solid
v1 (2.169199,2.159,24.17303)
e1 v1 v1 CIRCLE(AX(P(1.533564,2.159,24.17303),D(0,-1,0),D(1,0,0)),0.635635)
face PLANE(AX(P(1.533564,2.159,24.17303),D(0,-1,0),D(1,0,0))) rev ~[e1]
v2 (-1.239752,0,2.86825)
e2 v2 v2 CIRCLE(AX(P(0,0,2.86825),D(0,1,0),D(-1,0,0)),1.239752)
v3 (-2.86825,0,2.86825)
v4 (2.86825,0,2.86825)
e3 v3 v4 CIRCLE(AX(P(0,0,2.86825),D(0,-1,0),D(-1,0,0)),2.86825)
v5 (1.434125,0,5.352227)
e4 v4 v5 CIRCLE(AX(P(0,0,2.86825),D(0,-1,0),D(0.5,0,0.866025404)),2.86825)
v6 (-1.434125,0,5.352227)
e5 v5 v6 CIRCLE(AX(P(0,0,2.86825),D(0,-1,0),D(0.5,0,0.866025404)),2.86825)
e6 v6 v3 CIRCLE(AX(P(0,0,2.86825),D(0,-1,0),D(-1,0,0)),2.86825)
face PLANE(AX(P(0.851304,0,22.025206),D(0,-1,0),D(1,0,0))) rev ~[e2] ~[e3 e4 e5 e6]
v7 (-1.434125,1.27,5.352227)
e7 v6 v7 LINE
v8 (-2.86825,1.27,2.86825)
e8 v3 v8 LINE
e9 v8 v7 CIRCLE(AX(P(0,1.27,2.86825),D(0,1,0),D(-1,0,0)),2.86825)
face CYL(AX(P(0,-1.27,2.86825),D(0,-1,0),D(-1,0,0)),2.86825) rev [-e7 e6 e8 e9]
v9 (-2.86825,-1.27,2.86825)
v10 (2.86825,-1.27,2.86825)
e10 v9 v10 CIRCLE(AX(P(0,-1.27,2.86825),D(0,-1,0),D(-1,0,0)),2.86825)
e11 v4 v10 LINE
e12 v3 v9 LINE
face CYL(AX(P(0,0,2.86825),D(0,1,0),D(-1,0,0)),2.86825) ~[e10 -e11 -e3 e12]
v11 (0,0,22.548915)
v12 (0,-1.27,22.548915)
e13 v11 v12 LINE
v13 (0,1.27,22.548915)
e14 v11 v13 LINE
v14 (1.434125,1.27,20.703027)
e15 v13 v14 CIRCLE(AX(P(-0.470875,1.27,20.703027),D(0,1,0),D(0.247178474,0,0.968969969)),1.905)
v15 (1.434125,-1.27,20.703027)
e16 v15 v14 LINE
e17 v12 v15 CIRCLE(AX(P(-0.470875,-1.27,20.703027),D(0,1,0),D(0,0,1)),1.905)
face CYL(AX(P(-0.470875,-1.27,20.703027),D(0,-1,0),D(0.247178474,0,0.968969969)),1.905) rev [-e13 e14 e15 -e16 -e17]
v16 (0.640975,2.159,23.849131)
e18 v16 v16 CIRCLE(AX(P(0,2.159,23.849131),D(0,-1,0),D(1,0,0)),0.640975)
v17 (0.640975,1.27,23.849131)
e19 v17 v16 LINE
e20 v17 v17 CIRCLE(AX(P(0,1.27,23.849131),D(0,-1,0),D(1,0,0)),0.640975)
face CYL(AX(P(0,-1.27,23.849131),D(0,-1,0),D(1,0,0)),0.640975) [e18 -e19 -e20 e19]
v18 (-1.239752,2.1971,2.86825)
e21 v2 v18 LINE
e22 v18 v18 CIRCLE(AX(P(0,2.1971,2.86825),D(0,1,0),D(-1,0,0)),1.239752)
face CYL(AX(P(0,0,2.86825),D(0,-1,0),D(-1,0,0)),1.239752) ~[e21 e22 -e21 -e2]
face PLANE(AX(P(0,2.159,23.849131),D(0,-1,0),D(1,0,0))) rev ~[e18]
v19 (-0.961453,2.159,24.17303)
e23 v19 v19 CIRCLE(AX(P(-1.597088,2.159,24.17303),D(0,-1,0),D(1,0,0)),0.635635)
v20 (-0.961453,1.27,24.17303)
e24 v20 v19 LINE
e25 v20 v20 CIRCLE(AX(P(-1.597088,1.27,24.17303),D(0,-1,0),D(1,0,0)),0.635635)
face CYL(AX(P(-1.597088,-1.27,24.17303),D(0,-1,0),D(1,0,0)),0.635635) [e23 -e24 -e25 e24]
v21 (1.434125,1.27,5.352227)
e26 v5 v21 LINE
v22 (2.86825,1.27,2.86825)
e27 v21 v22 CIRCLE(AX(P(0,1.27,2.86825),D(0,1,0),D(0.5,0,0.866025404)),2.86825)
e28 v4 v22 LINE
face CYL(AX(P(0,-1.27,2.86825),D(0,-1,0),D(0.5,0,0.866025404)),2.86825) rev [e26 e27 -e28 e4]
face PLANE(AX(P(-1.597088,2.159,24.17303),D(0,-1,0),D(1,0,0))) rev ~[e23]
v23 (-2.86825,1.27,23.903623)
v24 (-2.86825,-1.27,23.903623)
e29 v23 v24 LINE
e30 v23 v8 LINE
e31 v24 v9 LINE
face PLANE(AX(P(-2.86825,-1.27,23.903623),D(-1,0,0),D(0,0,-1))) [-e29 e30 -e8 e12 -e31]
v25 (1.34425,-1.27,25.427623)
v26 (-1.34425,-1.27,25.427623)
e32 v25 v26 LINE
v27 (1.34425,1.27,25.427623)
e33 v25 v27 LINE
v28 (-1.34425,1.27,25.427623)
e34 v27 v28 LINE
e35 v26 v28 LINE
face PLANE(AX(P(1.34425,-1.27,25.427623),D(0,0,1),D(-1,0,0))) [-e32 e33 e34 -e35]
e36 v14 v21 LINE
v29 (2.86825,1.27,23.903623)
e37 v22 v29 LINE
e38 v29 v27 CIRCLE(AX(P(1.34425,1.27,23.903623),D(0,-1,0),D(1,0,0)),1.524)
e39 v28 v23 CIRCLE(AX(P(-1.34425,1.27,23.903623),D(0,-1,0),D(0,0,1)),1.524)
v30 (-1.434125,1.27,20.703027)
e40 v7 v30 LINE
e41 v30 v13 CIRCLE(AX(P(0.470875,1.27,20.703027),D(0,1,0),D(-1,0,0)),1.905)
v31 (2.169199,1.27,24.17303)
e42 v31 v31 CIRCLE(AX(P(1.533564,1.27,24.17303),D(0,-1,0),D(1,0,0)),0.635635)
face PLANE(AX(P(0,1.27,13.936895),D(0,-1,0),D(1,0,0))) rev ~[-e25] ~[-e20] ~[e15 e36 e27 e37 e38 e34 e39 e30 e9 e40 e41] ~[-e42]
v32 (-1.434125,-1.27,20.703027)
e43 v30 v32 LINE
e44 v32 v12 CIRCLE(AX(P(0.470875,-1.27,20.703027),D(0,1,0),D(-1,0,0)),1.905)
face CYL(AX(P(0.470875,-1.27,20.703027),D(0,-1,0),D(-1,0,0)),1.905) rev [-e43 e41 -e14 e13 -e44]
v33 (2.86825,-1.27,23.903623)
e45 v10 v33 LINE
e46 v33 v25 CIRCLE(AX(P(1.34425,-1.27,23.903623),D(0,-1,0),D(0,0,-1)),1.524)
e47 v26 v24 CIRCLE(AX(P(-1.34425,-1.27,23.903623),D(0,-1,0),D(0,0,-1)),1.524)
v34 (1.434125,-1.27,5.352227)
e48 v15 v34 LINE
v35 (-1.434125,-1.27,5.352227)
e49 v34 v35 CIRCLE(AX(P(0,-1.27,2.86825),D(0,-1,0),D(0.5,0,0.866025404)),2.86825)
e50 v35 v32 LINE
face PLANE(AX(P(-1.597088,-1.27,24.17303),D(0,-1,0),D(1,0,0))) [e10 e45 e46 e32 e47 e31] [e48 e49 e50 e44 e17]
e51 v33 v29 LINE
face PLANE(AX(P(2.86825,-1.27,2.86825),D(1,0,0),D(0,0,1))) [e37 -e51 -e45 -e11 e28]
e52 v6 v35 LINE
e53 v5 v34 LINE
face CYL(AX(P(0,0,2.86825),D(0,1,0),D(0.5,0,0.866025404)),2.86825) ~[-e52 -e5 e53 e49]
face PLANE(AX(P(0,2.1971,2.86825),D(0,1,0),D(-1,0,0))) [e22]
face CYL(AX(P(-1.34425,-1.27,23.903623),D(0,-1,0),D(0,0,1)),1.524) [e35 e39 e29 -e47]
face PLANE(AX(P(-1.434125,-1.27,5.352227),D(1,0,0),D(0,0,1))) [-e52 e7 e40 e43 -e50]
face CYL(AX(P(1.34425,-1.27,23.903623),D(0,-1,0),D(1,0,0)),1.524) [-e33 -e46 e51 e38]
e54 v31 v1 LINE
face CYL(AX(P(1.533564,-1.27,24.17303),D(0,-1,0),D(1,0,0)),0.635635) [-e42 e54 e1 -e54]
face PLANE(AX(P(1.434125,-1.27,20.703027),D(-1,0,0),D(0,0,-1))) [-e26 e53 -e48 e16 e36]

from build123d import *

# Parameters (mm, degrees)
F1_DEPTH    = 1.27
F3_R        = 1.524
F5_T1_DEPTH = 1.27
F2_R        = 1.2397519619
F6_DEPTH    = 2.1971
F4_R        = 0.6356353333
F4_R_2      = 0.6409754112
F7_DEPTH    = 3.429
F9_DEPTH    = 2.54


# Not quite as in the source:
# - a fillet or chamfer that OpenCascade refuses, or shapes differently, is made with other operations: its cross-section is extruded or revolved along the edge and cut away or added


with BuildPart() as f1:
    # F0 (on Front) → F1 (new body)
    with BuildSketch(Plane.XZ):
        with BuildLine():
            ThreePointArc((1.4341250062, 5.3522273875), (2.4839773751, 4.3023750186), (2.8682500124, 2.8682500124))
            Line((2.8682500124, 2.8682500124), (2.8682500124, 25.4276227206))
            Line((2.8682500124, 25.4276227206), (0, 25.4276227206))
            Line((0, 25.4276227206), (-1.4341250062, 25.4276227206))
            Line((-1.4341250062, 25.4276227206), (-2.8682500124, 25.4276227206))
            Line((-2.8682500124, 25.4276227206), (-2.8682500124, 2.8682500124))
            ThreePointArc((-2.8682500124, 2.8682500124), (-2.4839773751, 4.3023750186), (-1.4341250062, 5.3522273875))
            Line((-1.4341250062, 5.3522273875), (-1.4341250062, 22.6080268621))
            Line((-1.4341250062, 22.6080268621), (1.4341250062, 22.6080268621))
            Line((1.4341250062, 22.6080268621), (1.4341250062, 5.3522273875))
        make_face()
        with BuildLine():
            ThreePointArc((-2.8682500124, 2.8682500124), (0, 0), (2.8682500124, 2.8682500124))
            ThreePointArc((2.8682500124, 2.8682500124), (2.4839773751, 4.3023750186), (1.4341250062, 5.3522273875))
            ThreePointArc((1.4341250062, 5.3522273875), (0, 5.7365000248), (-1.4341250062, 5.3522273875))
            ThreePointArc((-1.4341250062, 5.3522273875), (-2.4839773751, 4.3023750186), (-2.8682500124, 2.8682500124))
        make_face()
    extrude(amount=F1_DEPTH)

    # F3
    f3_edges = [f1.edges().sort_by_distance(p)[0] for p in [
        (2.86825, -0.635, 25.427623),
        (-2.86825, -0.635, 25.427623),
    ]]
    fillet(f3_edges, radius=F3_R)

    # F5: fillet of radius 1.905 on 2 edges, made by hand

    # F5_s2 → F5_t1 (join)
    with BuildSketch(Plane.XZ):
        with BuildLine():
            ThreePointArc((-0.4708749938, 22.6080268621), (0.8761634244, 22.0500652803), (1.4341250062, 20.7030268621))
            Line((1.4341250062, 20.7030268621), (1.4341250062, 22.6080268621))
            Line((1.4341250062, 22.6080268621), (-0.4708749938, 22.6080268621))
        make_face()
        with BuildLine():
            ThreePointArc((-1.4341250062, 20.7030268621), (-0.8761634244, 22.0500652803), (0.4708749938, 22.6080268621))
            Line((0.4708749938, 22.6080268621), (-1.4341250062, 22.6080268621))
            Line((-1.4341250062, 22.6080268621), (-1.4341250062, 20.7030268621))
        make_face()
    extrude(amount=F5_T1_DEPTH)

    # F2 (on face) → F6 (join)
    with BuildSketch(Plane(origin=(0, 0, 0), x_dir=(-1, 0, 0), z_dir=(0, 1, 0))):
        with Locations((0, 2.8682500124)):
            Circle(F2_R)
    extrude(amount=F6_DEPTH)

    # F4 (on face) → F7 (join)
    with BuildSketch(Plane.XZ.offset(1.27)):
        with Locations((-1.5970880988, 24.1730304042)):
            Circle(F4_R)
        with Locations((1.5335635452, 24.1730304042)):
            Circle(F4_R)
        with Locations((0, 23.8491314396)):
            Circle(F4_R_2)
    extrude(amount=-F7_DEPTH)

    # F8 (on face) → F9 (join)
    with BuildSketch(Plane.XZ.offset(1.27)):
        with BuildLine():
            ThreePointArc((1.4341250062, 5.3522273875), (2.4839773751, 4.3023750186), (2.8682500124, 2.8682500124))
            Line((2.8682500124, 2.8682500124), (2.8682500124, 23.9036227206))
            ThreePointArc((2.8682500124, 23.9036227206), (1.7143439066, 22.42524303), (0, 23.1855921473))
            ThreePointArc((0, 23.1855921473), (-1.7143439066, 22.42524303), (-2.8682500124, 23.9036227206))
            Line((-2.8682500124, 23.9036227206), (-2.8682500124, 22.548914654))
            Line((-2.8682500124, 22.548914654), (-2.8682500124, 2.8682500124))
            ThreePointArc((-2.8682500124, 2.8682500124), (-2.4839773751, 4.3023750186), (-1.4341250062, 5.3522273875))
            Line((-1.4341250062, 5.3522273875), (-1.4341250062, 20.7030268621))
            ThreePointArc((-1.4341250062, 20.7030268621), (-1.0334590554, 21.8717886293), (0, 22.548914654))
            ThreePointArc((0, 22.548914654), (1.0334590554, 21.8717886293), (1.4341250062, 20.7030268621))
            Line((1.4341250062, 20.7030268621), (1.4341250062, 5.3522273875))
        make_face()
        with BuildLine():
            ThreePointArc((-2.8682500124, 23.9036227206), (-1.7143439066, 22.42524303), (0, 23.1855921473))
            ThreePointArc((0, 23.1855921473), (-0.1797499876, 23.9036227206), (0, 24.6216532939))
            ThreePointArc((0, 24.6216532939), (-0.5605736103, 25.2106909273), (-1.3442500124, 25.4276227206))
            ThreePointArc((-1.3442500124, 25.4276227206), (-2.4218807469, 24.9812534551), (-2.8682500124, 23.9036227206))
        make_face()
        with BuildLine():
            ThreePointArc((0, 23.1855921473), (1.7143439066, 22.42524303), (2.8682500124, 23.9036227206))
            ThreePointArc((2.8682500124, 23.9036227206), (2.4218807469, 24.9812534551), (1.3442500124, 25.4276227206))
            ThreePointArc((1.3442500124, 25.4276227206), (0.5605736103, 25.2106909273), (0, 24.6216532939))
            ThreePointArc((0, 24.6216532939), (0.1341296782, 24.2737166148), (0.1797499876, 23.9036227206))
            ThreePointArc((0.1797499876, 23.9036227206), (0.1341296782, 23.5335288264), (0, 23.1855921473))
        make_face()
        with BuildLine():
            ThreePointArc((0, 24.6216532939), (-0.1797499876, 23.9036227206), (0, 23.1855921473))
            ThreePointArc((0, 23.1855921473), (0.1341296782, 23.5335288264), (0.1797499876, 23.9036227206))
            ThreePointArc((0.1797499876, 23.9036227206), (0.1341296782, 24.2737166148), (0, 24.6216532939))
        make_face()
        with BuildLine():
            ThreePointArc((0, 24.6216532939), (0.5605736103, 25.2106909273), (1.3442500124, 25.4276227206))
            Line((1.3442500124, 25.4276227206), (-1.3442500124, 25.4276227206))
            ThreePointArc((-1.3442500124, 25.4276227206), (-0.5605736103, 25.2106909273), (0, 24.6216532939))
        make_face()
    extrude(amount=-F9_DEPTH)


solid = f1.part
